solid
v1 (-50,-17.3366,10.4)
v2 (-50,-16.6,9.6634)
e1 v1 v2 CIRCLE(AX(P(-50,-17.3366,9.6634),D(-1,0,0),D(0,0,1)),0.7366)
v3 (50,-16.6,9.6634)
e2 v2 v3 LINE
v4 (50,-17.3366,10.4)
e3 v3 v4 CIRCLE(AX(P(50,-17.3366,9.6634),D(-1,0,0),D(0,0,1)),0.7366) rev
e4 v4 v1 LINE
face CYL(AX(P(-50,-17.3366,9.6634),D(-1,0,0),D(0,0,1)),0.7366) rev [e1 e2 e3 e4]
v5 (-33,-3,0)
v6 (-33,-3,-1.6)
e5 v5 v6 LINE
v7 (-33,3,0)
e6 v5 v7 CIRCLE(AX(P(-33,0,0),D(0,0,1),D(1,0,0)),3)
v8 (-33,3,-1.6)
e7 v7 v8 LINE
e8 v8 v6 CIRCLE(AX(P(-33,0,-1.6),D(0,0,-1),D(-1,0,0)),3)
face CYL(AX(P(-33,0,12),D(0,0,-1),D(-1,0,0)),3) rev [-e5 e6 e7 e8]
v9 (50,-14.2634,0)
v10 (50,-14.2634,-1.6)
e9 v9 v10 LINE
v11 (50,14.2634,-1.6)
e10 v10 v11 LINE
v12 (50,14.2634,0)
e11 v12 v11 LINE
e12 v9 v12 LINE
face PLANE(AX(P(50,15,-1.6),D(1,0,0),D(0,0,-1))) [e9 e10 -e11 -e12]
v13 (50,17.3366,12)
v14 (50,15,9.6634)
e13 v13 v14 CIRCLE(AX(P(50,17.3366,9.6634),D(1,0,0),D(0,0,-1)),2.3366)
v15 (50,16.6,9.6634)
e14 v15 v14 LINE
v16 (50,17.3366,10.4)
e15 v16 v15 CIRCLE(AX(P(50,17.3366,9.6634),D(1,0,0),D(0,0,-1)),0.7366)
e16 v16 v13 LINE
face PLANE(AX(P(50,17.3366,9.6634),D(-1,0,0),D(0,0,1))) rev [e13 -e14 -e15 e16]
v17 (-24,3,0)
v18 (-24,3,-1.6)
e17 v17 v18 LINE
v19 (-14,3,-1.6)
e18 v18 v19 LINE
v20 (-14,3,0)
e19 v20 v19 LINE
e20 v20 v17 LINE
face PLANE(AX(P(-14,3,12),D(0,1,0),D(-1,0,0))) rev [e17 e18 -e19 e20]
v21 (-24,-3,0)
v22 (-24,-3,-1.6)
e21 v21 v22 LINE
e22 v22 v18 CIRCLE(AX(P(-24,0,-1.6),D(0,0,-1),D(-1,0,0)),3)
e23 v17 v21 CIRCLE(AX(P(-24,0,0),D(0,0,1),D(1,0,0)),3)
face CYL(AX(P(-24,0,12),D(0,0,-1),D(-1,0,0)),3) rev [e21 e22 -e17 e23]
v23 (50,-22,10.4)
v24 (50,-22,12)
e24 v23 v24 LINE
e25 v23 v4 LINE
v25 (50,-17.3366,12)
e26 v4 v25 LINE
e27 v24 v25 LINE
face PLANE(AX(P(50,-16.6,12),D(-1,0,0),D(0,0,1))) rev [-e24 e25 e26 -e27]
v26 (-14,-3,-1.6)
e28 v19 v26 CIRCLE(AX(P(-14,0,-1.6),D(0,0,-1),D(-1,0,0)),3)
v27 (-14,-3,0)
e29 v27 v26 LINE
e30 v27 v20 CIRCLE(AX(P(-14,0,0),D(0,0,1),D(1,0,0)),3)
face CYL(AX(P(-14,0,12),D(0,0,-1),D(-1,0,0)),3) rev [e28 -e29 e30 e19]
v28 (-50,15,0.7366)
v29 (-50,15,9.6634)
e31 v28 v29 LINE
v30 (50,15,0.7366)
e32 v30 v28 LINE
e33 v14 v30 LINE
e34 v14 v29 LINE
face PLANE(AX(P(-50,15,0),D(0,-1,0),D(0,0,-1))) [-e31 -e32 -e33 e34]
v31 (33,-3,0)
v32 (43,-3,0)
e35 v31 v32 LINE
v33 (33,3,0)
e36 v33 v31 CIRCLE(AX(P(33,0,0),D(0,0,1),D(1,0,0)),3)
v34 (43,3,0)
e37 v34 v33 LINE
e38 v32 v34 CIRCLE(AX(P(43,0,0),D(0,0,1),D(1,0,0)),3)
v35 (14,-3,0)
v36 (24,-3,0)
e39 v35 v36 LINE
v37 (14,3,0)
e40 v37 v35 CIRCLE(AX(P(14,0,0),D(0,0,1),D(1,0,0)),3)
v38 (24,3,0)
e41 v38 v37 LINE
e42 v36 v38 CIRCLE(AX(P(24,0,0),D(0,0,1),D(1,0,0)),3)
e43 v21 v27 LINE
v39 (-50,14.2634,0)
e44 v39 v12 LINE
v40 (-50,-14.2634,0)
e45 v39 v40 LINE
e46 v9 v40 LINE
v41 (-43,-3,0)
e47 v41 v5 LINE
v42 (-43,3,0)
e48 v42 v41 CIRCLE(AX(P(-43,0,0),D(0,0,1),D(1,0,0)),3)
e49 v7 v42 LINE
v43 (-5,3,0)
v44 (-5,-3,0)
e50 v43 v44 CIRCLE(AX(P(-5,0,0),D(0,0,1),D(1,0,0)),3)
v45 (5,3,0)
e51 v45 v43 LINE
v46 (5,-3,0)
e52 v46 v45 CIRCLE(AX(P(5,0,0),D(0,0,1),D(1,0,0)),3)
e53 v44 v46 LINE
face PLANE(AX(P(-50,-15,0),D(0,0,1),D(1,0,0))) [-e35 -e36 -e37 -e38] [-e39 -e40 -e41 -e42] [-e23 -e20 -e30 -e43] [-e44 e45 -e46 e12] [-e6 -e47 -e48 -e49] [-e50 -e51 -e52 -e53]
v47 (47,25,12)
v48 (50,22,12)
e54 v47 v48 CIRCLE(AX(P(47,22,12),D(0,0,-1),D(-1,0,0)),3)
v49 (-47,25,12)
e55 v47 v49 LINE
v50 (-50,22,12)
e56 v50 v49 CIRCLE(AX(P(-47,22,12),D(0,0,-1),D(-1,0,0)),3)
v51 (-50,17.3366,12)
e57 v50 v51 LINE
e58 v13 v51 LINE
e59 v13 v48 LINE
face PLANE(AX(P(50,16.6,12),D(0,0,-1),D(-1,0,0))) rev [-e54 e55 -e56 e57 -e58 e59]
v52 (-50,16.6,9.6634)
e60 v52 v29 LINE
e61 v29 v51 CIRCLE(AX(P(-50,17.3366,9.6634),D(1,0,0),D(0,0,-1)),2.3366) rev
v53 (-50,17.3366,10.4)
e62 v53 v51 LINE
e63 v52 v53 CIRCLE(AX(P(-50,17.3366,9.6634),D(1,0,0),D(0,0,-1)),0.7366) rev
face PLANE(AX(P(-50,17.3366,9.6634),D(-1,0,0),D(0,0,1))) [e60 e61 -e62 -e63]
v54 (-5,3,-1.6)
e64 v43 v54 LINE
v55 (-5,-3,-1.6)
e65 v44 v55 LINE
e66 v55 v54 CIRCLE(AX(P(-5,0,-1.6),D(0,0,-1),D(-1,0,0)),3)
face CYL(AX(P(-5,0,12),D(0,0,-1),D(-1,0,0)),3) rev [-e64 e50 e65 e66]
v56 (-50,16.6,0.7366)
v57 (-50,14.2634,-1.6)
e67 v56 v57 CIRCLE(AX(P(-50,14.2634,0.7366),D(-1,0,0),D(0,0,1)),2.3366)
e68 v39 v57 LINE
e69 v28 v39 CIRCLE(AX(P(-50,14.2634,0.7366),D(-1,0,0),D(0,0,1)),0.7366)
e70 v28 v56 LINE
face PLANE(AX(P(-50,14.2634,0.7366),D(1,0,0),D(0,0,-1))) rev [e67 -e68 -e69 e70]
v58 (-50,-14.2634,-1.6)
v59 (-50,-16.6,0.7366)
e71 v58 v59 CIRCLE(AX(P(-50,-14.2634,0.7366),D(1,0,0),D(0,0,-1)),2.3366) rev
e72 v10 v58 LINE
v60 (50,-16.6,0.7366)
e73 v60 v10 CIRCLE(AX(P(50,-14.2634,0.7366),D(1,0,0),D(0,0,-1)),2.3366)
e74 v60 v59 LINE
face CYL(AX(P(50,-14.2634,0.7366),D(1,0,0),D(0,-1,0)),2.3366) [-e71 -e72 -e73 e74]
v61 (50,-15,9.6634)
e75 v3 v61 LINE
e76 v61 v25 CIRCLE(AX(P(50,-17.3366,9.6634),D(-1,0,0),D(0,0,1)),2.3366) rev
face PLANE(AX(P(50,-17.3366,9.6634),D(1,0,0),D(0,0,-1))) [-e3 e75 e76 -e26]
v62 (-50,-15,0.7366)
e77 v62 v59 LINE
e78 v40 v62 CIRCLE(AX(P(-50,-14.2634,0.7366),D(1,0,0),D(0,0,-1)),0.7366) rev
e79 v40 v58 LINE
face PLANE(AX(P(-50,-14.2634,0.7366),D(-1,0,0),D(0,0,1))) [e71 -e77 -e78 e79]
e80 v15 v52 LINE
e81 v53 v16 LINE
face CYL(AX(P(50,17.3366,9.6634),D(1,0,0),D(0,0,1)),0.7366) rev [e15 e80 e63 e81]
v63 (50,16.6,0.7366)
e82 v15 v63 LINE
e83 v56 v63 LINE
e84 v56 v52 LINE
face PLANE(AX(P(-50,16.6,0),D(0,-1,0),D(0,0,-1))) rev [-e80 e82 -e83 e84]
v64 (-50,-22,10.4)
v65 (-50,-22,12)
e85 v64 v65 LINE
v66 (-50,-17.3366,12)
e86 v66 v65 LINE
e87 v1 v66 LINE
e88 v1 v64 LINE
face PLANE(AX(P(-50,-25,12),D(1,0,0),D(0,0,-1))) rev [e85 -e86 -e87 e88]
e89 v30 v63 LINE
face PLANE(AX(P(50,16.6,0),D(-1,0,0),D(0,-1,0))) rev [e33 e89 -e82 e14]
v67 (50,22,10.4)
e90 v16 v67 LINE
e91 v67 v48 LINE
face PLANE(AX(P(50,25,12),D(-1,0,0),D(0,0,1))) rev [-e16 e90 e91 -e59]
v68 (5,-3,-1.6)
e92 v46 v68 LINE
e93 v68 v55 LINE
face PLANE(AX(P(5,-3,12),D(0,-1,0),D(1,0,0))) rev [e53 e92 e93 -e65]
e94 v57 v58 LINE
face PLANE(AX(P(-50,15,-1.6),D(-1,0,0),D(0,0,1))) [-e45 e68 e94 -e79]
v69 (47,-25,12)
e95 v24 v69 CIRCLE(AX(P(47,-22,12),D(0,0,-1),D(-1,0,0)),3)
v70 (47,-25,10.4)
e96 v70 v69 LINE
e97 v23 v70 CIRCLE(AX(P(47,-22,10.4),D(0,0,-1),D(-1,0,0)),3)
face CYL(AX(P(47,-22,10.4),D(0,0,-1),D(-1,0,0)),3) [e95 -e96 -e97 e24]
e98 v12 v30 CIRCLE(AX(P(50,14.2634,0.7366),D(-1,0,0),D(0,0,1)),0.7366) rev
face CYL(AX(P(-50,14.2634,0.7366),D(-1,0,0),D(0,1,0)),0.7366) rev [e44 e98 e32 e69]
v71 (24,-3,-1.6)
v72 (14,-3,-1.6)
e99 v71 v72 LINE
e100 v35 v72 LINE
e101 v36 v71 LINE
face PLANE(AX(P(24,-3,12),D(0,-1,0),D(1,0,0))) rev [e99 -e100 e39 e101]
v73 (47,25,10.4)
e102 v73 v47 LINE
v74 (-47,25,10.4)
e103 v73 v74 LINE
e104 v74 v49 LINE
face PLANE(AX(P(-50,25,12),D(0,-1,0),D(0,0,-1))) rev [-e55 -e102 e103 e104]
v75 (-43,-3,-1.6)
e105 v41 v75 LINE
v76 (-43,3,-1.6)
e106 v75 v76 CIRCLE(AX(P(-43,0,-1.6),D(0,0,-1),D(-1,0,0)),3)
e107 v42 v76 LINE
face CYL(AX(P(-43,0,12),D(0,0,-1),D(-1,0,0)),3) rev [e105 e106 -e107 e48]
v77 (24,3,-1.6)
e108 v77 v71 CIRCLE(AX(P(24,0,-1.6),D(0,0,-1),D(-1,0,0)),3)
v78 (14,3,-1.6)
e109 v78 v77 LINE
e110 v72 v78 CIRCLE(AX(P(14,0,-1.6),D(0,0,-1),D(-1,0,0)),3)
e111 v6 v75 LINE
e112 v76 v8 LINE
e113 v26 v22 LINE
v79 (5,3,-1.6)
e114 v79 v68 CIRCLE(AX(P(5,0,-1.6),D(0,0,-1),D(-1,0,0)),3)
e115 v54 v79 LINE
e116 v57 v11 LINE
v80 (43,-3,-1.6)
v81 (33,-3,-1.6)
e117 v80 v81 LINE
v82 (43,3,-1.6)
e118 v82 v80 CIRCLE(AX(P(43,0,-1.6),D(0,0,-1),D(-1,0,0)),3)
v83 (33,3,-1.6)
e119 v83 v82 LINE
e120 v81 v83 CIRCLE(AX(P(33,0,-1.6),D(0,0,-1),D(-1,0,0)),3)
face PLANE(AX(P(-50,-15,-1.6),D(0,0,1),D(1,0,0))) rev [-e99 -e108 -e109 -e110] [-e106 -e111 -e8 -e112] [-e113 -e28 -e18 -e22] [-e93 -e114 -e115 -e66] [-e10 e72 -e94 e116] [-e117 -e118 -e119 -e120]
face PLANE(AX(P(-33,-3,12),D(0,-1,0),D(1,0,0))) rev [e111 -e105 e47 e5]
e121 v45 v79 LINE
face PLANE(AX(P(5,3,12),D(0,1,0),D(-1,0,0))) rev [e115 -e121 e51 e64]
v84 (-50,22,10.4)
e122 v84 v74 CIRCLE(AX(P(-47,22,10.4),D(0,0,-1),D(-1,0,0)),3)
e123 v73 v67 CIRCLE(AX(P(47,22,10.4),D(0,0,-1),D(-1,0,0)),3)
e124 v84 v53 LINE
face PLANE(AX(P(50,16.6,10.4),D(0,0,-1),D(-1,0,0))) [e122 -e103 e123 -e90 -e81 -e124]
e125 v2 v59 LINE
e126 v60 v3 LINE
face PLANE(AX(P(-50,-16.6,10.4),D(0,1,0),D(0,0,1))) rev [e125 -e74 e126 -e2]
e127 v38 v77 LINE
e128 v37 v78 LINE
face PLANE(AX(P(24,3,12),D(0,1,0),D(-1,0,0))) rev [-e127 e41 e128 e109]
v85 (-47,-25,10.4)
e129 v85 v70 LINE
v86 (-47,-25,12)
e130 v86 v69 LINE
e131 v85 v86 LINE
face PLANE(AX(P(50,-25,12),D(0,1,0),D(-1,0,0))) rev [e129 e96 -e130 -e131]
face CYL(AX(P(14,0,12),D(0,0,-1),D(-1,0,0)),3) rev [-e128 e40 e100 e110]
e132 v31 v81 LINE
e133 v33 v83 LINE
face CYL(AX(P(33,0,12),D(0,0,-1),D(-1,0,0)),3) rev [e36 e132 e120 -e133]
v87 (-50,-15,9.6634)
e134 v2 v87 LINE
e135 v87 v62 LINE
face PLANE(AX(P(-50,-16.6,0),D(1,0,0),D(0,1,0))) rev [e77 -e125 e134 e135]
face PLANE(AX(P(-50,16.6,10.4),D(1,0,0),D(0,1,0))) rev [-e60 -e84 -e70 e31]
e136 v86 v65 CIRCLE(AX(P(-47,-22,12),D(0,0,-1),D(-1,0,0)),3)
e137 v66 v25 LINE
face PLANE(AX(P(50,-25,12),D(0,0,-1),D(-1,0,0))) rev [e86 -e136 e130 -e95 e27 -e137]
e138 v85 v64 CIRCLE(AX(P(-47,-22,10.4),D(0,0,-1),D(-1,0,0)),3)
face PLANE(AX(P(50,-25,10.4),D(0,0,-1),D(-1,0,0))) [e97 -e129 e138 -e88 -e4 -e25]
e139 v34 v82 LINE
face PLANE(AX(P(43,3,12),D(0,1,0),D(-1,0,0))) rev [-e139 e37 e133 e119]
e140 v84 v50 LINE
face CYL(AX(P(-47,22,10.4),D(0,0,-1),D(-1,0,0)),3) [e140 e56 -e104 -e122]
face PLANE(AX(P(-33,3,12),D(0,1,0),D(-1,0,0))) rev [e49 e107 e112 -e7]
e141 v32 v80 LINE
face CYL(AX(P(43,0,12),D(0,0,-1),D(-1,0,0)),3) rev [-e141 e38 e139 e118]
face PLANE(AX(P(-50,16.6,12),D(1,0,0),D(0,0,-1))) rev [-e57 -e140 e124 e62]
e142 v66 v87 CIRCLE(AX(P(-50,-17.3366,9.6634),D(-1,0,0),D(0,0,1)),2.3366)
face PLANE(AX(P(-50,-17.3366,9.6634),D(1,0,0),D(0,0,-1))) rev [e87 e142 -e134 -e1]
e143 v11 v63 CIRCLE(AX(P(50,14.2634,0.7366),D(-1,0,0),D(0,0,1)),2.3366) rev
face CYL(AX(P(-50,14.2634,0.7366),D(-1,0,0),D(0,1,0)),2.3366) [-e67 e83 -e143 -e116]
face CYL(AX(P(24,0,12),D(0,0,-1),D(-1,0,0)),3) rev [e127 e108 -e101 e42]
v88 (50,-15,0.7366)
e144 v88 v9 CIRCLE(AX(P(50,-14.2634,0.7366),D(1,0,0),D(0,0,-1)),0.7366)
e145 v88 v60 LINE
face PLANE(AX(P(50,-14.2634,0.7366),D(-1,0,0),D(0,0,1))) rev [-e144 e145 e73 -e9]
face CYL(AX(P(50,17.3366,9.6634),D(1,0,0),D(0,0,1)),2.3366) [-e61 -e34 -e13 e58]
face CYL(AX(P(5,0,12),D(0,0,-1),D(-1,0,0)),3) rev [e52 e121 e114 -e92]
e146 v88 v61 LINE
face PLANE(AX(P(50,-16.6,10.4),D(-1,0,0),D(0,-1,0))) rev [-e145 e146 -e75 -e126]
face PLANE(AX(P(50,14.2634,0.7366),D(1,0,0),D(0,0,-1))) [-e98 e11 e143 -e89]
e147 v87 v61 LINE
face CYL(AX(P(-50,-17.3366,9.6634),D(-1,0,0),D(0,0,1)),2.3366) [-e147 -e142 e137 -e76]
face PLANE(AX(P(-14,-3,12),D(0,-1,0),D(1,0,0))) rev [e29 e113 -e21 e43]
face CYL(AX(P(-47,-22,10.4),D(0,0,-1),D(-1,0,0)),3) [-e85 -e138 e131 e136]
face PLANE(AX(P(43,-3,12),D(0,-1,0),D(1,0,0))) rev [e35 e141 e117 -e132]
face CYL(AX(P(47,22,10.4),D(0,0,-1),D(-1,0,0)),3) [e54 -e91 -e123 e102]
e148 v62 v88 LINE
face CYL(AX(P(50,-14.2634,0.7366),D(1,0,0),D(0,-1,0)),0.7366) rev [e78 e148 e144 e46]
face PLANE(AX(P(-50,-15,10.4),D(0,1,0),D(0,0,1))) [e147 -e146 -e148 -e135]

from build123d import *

# Parameters (mm, degrees)
SKETCH_1_W                         = 100
SKETCH_1_H                         = 30
SM_BASE_FLANGE_1_DEPTH             = 1.6
SM_EDGE_FLANGE_1_STRIP_W           = 7.8732
SM_EDGE_FLANGE_1_STRIP_H           = 1.6
SM_EDGE_FLANGE_1_STRIP_CUT_DEPTH   = 100
SM_EDGE_FLANGE_1_STRIP_2_W         = 7.8732
SM_EDGE_FLANGE_1_STRIP_2_H         = 1.6
SM_EDGE_FLANGE_1_STRIP_CUT_2_DEPTH = 100
SM_EDGE_FLANGE_1_DEPTH             = 100
SM_EDGE_FLANGE_1_BEND_DEPTH        = 100
SM_EDGE_FLANGE_2_STRIP_W           = 7.8732
SM_EDGE_FLANGE_2_STRIP_H           = 1.6
SM_EDGE_FLANGE_2_STRIP_CUT_DEPTH   = 100
SM_EDGE_FLANGE_2_STRIP_2_W         = 7.8732
SM_EDGE_FLANGE_2_STRIP_2_H         = 1.6
SM_EDGE_FLANGE_2_STRIP_CUT_2_DEPTH = 100
SM_EDGE_FLANGE_2_DEPTH             = 100
SM_EDGE_FLANGE_2_BEND_DEPTH        = 100
CUT_EXTRUDE_1_DEPTH                = 58.175169436
CUT_EXTRUDE_2_DEPTH                = 58.532251825


# Sheet-metal steps are written as plain solids
with BuildPart() as part:
    # Sketch 1 → 基体-法兰1 (new body)
    with BuildSketch(Plane.XY):
        Rectangle(SKETCH_1_W, SKETCH_1_H)
    extrude(amount=-SM_BASE_FLANGE_1_DEPTH)

    # 边线-法兰1 strip (across the edge) → 边线-法兰1 strip cut (cut)
    with BuildSketch(Plane(origin=(50, 15, 0), x_dir=(0, -1, 0), z_dir=(-1, 0, 0))):
        with Locations((-3.2, -0.8)):
            Rectangle(SM_EDGE_FLANGE_1_STRIP_W, SM_EDGE_FLANGE_1_STRIP_H)
    extrude(amount=SM_EDGE_FLANGE_1_STRIP_CUT_DEPTH, mode=Mode.SUBTRACT)

    # 边线-法兰1 strip 2 (across the edge) → 边线-法兰1 strip cut 2 (cut)
    with BuildSketch(Plane(origin=(-50, -15, 0), x_dir=(0, 1, 0), z_dir=(1, 0, 0))):
        with Locations((-3.2, -0.8)):
            Rectangle(SM_EDGE_FLANGE_1_STRIP_2_W, SM_EDGE_FLANGE_1_STRIP_2_H)
    extrude(amount=SM_EDGE_FLANGE_1_STRIP_CUT_2_DEPTH, mode=Mode.SUBTRACT)

    # 边线-法兰1 section (across the edge) → 边线-法兰1 (add)
    with BuildSketch(Plane(origin=(50, 15, 0), x_dir=(0, -1, 0), z_dir=(-1, 0, 0))):
        with BuildLine():
            Line((-1.6, 0.7366), (-1.6, 10.4))
            Line((-1.6, 10.4), (0, 10.4))
            Line((0, 10.4), (0, 0.7366))
            ThreePointArc((0, 0.7366), (0.215745145, 0.215745145), (0.7366, 0))
            Line((0.7366, 0), (0.7366, -1.6))
            ThreePointArc((0.7366, -1.6), (-0.915625705, -0.915625705), (-1.6, 0.7366))
        make_face()
    extrude(amount=SM_EDGE_FLANGE_1_DEPTH)

    # 边线-法兰1 section 2 (across the edge) → 边线-法兰1 bend (add)
    with BuildSketch(Plane(origin=(-50, -15, 0), x_dir=(0, 1, 0), z_dir=(1, 0, 0))):
        with BuildLine():
            Line((-1.6, 0.7366), (-1.6, 10.4))
            Line((-1.6, 10.4), (0, 10.4))
            Line((0, 10.4), (0, 0.7366))
            ThreePointArc((0, 0.7366), (0.215745145, 0.215745145), (0.7366, 0))
            Line((0.7366, 0), (0.7366, -1.6))
            ThreePointArc((0.7366, -1.6), (-0.915625705, -0.915625705), (-1.6, 0.7366))
        make_face()
    extrude(amount=SM_EDGE_FLANGE_1_BEND_DEPTH)

    # 边线-法兰2 strip (across the edge) → 边线-法兰2 strip cut (cut)
    with BuildSketch(Plane(origin=(-50, 16.6, 10.4), x_dir=(0, 0, -1), z_dir=(1, 0, 0))):
        with Locations((-3.2, -0.8)):
            Rectangle(SM_EDGE_FLANGE_2_STRIP_W, SM_EDGE_FLANGE_2_STRIP_H)
    extrude(amount=SM_EDGE_FLANGE_2_STRIP_CUT_DEPTH, mode=Mode.SUBTRACT)

    # 边线-法兰2 strip 2 (across the edge) → 边线-法兰2 strip cut 2 (cut)
    with BuildSketch(Plane(origin=(50, -16.6, 10.4), x_dir=(0, 0, -1), z_dir=(-1, 0, 0))):
        with Locations((-3.2, -0.8)):
            Rectangle(SM_EDGE_FLANGE_2_STRIP_2_W, SM_EDGE_FLANGE_2_STRIP_2_H)
    extrude(amount=SM_EDGE_FLANGE_2_STRIP_CUT_2_DEPTH, mode=Mode.SUBTRACT)

    # 边线-法兰2 section (across the edge) → 边线-法兰2 (add)
    with BuildSketch(Plane(origin=(-50, 16.6, 10.4), x_dir=(0, 0, -1), z_dir=(1, 0, 0))):
        with BuildLine():
            Line((-1.6, 0.7366), (-1.6, 8.4))
            Line((-1.6, 8.4), (0, 8.4))
            Line((0, 8.4), (0, 0.7366))
            ThreePointArc((0, 0.7366), (0.215745145, 0.215745145), (0.7366, 0))
            Line((0.7366, 0), (0.7366, -1.6))
            ThreePointArc((0.7366, -1.6), (-0.915625705, -0.915625705), (-1.6, 0.7366))
        make_face()
    extrude(amount=SM_EDGE_FLANGE_2_DEPTH)

    # 边线-法兰2 section 2 (across the edge) → 边线-法兰2 bend (add)
    with BuildSketch(Plane(origin=(50, -16.6, 10.4), x_dir=(0, 0, -1), z_dir=(-1, 0, 0))):
        with BuildLine():
            Line((-1.6, 0.7366), (-1.6, 8.4))
            Line((-1.6, 8.4), (0, 8.4))
            Line((0, 8.4), (0, 0.7366))
            ThreePointArc((0, 0.7366), (0.215745145, 0.215745145), (0.7366, 0))
            Line((0.7366, 0), (0.7366, -1.6))
            ThreePointArc((0.7366, -1.6), (-0.915625705, -0.915625705), (-1.6, 0.7366))
        make_face()
    extrude(amount=SM_EDGE_FLANGE_2_BEND_DEPTH)

    # 草图18 → 切除-拉伸1 (cut, through all)
    with BuildSketch(Plane.XY):
        with BuildLine():
            Line((50, 25), (47, 25))
            ThreePointArc((47, 25), (49.121320344, 24.121320344), (50, 22))
            Line((50, 22), (50, 25))
        make_face()
        with BuildLine():
            Line((-47, 25), (-50, 25))
            Line((-50, 25), (-50, 22))
            ThreePointArc((-50, 22), (-49.121320344, 24.121320344), (-47, 25))
        make_face()
        with BuildLine():
            Line((-50, -22), (-50, -25))
            Line((-50, -25), (-47, -25))
            ThreePointArc((-47, -25), (-49.121320344, -24.121320344), (-50, -22))
        make_face()
        with BuildLine():
            Line((47, -25), (50, -25))
            Line((50, -25), (50, -22))
            ThreePointArc((50, -22), (49.121320344, -24.121320344), (47, -25))
        make_face()
    extrude(amount=CUT_EXTRUDE_1_DEPTH, mode=Mode.SUBTRACT)

    # 草图19 → 切除-拉伸2 (cut, through all)
    with BuildSketch(Plane(origin=(0, 0, -1.6), x_dir=(-1, 0, 0), z_dir=(0, 0, -1))):
        with BuildLine():
            Line((-43, 3), (-33, 3))
            ThreePointArc((-33, 3), (-30, 0), (-33, -3))
            Line((-33, -3), (-43, -3))
            ThreePointArc((-43, -3), (-46, 0), (-43, 3))
        make_face()
        with BuildLine():
            Line((-24, 3), (-14, 3))
            ThreePointArc((-14, 3), (-11, 0), (-14, -3))
            Line((-14, -3), (-24, -3))
            ThreePointArc((-24, -3), (-27, 0), (-24, 3))
        make_face()
        with BuildLine():
            Line((-5, 3), (5, 3))
            ThreePointArc((5, 3), (8, 0), (5, -3))
            Line((5, -3), (-5, -3))
            ThreePointArc((-5, -3), (-8, 0), (-5, 3))
        make_face()
        with BuildLine():
            Line((14, 3), (24, 3))
            ThreePointArc((24, 3), (27, 0), (24, -3))
            Line((24, -3), (14, -3))
            ThreePointArc((14, -3), (11, 0), (14, 3))
        make_face()
        with BuildLine():
            Line((33, 3), (43, 3))
            ThreePointArc((43, 3), (46, 0), (43, -3))
            Line((43, -3), (33, -3))
            ThreePointArc((33, -3), (30, 0), (33, 3))
        make_face()
    extrude(amount=-CUT_EXTRUDE_2_DEPTH, mode=Mode.SUBTRACT)


solid = part.part
